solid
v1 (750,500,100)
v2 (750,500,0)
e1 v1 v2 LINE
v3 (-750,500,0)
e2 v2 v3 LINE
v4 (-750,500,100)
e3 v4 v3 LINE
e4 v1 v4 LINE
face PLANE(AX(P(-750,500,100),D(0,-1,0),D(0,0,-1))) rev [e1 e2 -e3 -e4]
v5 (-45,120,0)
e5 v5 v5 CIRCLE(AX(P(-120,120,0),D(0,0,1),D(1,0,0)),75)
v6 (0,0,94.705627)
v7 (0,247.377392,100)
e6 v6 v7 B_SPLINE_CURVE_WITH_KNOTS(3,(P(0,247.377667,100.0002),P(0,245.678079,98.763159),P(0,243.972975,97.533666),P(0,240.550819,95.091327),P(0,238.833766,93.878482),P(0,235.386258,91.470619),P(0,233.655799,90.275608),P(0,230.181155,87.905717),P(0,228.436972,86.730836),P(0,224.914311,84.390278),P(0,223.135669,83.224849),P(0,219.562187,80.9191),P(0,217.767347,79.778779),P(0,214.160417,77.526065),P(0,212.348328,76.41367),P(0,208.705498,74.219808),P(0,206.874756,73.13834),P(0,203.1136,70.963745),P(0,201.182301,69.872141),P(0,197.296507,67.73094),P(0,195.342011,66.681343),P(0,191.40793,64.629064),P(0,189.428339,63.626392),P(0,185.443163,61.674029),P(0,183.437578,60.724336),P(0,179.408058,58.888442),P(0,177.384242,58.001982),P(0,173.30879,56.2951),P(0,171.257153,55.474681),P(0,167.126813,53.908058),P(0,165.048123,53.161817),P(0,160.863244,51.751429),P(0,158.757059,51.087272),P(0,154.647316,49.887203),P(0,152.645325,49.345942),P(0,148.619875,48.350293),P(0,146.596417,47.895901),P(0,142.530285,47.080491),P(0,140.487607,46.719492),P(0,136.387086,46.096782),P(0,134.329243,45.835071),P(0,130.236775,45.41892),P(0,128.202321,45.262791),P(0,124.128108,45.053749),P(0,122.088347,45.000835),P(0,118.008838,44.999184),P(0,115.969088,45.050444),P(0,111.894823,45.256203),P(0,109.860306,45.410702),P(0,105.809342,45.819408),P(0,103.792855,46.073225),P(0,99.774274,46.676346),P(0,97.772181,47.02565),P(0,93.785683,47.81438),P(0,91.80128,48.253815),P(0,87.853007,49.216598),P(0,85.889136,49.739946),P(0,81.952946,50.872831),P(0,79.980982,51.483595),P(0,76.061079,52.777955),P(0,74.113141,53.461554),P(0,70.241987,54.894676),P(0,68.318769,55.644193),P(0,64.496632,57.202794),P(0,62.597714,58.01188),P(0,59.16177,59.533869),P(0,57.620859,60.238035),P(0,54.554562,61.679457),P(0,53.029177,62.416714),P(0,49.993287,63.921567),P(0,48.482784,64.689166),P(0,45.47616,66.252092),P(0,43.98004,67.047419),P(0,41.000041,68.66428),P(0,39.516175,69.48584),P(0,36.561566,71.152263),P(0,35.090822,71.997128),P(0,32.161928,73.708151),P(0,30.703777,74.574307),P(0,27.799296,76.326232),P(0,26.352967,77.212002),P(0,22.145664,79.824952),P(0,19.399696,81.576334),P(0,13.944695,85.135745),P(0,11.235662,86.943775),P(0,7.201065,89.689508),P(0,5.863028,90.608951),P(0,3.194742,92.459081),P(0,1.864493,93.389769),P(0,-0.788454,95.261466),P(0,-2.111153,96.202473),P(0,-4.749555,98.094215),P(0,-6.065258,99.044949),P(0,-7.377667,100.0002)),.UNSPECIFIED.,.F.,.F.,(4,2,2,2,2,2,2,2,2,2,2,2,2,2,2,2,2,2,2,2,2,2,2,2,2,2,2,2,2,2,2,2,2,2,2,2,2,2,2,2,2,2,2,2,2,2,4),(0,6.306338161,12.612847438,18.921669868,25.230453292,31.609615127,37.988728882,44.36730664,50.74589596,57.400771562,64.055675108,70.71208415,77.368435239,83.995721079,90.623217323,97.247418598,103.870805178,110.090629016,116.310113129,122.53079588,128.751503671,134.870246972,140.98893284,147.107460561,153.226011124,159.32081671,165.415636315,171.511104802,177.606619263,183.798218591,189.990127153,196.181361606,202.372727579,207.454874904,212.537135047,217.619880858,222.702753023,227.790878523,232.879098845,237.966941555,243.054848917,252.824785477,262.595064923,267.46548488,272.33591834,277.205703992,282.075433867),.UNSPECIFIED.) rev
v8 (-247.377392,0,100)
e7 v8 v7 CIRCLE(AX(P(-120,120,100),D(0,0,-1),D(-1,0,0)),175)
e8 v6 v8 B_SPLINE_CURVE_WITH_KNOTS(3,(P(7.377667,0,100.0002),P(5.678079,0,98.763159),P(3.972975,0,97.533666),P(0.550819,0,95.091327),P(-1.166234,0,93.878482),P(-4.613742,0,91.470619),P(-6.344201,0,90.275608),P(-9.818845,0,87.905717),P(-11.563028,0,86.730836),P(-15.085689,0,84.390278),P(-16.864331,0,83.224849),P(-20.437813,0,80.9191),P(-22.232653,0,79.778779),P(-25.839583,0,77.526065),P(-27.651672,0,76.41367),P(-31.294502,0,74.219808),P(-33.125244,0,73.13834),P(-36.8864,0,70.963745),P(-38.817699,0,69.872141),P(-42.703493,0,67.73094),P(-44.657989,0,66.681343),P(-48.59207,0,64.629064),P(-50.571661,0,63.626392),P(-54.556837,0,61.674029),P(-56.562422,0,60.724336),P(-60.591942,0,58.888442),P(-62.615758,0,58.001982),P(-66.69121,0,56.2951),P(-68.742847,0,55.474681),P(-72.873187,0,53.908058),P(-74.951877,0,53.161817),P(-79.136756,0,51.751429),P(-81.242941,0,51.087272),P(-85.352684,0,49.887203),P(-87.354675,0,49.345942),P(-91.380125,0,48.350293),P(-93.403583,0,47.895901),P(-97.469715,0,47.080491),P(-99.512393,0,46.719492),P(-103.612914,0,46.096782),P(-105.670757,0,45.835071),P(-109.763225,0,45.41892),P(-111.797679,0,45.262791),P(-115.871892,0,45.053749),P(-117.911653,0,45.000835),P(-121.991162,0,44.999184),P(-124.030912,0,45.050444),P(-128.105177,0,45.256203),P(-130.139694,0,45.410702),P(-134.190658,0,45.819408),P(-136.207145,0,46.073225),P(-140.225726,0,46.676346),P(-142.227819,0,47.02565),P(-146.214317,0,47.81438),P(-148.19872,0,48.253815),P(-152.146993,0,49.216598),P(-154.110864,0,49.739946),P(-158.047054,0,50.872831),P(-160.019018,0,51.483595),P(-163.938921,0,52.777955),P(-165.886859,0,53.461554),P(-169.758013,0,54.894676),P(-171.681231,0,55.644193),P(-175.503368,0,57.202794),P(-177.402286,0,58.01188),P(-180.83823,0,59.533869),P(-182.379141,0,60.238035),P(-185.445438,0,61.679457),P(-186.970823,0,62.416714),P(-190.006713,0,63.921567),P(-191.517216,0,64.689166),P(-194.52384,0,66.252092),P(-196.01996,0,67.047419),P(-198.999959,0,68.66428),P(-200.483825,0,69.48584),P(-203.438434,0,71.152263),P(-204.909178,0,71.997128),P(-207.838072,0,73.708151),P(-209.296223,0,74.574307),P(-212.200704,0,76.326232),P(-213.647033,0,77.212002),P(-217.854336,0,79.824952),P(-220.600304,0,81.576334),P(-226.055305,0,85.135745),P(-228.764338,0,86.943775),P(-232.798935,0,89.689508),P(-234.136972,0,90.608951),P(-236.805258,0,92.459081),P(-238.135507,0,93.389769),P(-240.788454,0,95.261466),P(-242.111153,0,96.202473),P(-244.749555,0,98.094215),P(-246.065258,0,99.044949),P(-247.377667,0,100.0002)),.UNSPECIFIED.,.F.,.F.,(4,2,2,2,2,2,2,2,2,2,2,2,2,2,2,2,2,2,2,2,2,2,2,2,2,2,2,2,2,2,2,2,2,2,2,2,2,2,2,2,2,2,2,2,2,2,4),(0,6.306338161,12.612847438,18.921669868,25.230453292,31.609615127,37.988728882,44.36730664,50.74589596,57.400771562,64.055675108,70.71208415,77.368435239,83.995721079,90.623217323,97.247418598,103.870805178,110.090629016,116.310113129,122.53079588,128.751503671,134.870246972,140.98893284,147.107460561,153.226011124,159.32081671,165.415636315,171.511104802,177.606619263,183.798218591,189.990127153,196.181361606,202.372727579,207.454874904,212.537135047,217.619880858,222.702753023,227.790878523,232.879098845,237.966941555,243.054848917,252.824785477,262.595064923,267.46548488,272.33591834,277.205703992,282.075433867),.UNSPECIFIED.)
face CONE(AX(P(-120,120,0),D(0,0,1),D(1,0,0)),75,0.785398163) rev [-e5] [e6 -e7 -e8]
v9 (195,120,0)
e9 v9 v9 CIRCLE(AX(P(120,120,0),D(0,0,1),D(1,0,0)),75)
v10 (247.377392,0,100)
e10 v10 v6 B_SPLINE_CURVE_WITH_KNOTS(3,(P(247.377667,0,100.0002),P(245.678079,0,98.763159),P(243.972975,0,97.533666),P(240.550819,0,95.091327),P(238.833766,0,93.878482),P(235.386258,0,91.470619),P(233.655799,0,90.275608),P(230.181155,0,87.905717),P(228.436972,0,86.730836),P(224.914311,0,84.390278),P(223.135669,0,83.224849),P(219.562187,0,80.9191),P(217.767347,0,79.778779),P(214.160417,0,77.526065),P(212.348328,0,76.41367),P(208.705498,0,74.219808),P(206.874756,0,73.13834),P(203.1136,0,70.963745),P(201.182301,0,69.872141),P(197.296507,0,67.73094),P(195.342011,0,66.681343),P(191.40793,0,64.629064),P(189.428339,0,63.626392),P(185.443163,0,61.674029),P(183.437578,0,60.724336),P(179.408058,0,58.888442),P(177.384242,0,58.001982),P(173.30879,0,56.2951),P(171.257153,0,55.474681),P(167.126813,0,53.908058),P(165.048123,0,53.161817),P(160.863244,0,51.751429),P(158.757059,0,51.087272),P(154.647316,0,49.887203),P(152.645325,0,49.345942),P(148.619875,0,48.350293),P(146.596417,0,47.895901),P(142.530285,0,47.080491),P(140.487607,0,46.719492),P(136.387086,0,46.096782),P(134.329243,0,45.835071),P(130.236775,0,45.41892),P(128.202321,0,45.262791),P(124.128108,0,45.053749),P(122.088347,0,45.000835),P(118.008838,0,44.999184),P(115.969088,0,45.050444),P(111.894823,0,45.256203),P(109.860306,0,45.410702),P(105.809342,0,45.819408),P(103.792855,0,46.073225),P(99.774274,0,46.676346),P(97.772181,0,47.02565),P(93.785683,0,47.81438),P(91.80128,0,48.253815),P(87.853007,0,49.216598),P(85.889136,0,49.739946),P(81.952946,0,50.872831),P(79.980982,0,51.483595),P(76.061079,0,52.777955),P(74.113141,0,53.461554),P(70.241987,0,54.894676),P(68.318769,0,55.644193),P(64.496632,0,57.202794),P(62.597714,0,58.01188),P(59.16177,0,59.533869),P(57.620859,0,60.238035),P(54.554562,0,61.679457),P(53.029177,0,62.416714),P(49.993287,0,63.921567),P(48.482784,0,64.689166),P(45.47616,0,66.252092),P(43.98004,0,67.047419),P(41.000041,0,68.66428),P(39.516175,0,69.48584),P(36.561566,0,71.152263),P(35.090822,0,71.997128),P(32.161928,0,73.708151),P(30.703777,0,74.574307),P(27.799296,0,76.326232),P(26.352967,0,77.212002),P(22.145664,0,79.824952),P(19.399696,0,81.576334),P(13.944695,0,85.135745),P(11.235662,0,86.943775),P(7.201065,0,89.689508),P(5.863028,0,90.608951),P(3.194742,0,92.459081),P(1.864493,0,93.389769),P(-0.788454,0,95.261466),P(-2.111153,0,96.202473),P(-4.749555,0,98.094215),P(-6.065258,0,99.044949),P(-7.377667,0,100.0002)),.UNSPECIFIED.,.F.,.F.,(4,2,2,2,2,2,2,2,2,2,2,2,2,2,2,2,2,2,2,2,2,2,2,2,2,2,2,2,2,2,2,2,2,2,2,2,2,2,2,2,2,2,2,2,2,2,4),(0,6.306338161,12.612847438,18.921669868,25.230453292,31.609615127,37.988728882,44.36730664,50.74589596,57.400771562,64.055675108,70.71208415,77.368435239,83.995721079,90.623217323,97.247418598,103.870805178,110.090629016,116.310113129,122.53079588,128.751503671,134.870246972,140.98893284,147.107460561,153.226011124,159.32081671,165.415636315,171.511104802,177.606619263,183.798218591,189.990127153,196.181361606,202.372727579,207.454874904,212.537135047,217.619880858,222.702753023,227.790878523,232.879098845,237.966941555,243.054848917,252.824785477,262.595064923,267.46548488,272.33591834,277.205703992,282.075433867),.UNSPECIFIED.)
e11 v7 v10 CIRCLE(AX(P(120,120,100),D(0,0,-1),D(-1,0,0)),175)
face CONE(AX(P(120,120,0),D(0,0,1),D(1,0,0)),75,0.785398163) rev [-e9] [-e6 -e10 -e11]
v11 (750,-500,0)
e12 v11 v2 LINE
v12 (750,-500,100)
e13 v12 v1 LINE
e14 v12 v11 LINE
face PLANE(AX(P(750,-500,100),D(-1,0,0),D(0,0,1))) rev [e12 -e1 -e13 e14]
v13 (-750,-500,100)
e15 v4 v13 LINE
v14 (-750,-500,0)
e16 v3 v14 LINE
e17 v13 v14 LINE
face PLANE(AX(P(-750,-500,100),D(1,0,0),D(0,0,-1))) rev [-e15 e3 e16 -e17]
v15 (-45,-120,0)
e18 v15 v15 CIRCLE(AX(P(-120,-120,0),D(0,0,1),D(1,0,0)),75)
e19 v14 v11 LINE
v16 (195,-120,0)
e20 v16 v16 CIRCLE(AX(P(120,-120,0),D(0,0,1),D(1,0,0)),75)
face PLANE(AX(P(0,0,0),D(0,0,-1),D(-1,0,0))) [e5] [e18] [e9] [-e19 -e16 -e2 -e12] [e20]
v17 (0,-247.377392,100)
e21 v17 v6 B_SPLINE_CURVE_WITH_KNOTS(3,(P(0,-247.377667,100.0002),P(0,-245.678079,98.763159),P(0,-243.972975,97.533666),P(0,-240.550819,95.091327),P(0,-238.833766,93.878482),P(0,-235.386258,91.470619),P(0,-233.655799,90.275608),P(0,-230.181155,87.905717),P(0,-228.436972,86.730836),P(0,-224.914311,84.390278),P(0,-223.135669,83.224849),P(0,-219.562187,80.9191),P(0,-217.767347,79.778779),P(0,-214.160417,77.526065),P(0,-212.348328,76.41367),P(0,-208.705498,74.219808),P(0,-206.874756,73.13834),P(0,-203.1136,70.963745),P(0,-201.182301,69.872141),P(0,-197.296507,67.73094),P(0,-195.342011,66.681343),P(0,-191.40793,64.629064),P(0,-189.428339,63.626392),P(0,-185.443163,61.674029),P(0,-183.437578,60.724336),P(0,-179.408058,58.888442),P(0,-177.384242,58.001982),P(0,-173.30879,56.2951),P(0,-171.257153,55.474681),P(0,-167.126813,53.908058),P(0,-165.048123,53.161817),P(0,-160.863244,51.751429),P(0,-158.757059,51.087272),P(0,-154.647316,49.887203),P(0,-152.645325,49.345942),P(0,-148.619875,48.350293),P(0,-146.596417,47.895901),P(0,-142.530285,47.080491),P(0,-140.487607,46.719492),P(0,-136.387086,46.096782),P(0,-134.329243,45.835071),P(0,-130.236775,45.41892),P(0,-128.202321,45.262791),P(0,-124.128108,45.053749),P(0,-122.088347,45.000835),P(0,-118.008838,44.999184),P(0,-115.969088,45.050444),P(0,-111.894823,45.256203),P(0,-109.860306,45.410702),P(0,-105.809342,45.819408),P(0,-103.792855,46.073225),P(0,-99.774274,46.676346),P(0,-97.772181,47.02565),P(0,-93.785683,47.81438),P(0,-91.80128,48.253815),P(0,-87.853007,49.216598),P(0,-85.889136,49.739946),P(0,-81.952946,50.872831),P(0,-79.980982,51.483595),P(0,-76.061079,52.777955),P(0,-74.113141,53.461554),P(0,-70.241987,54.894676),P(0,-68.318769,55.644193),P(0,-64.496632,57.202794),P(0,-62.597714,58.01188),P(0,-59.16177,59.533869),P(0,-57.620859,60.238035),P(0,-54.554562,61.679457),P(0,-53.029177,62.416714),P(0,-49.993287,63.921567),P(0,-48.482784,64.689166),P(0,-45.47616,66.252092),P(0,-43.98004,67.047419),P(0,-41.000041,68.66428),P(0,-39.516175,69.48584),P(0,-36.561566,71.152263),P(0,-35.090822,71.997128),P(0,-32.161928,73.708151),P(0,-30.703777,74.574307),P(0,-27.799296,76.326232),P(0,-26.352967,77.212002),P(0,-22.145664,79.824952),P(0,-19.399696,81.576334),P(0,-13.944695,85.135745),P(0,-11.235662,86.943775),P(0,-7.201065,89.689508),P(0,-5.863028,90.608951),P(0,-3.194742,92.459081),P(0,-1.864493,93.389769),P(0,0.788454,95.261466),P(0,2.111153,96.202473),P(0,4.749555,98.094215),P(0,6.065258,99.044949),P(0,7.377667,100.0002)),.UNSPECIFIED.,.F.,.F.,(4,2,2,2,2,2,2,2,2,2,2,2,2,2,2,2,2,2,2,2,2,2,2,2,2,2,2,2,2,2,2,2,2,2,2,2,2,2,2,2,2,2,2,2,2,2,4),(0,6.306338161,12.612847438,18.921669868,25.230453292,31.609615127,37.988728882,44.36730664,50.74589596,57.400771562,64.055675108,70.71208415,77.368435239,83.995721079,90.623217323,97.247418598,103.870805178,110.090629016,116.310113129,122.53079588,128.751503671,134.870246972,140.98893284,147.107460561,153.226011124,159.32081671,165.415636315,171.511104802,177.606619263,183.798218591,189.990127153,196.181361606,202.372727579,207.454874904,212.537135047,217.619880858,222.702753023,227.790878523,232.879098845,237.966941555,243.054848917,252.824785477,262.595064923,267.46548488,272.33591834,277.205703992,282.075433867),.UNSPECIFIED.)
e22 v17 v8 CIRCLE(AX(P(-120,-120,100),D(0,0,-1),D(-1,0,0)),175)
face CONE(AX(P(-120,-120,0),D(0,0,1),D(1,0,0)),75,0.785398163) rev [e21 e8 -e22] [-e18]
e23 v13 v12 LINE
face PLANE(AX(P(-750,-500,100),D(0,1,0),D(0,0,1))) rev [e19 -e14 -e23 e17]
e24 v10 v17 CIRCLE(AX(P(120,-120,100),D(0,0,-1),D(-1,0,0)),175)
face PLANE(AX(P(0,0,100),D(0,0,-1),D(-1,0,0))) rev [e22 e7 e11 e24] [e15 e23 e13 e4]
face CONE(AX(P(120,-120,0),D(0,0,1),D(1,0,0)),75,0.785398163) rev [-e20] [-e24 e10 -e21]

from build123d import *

# Parameters (mm, degrees)
SKETCH1_W           = 1500
SKETCH1_H           = 1000
SKETCH1_R           = 75
BOSS_EXTRUDE1_DEPTH = 100
CHAMFER1_SIZE       = 100


with BuildPart() as part:
    # Sketch1 → Boss-Extrude1 (new body)
    with BuildSketch(Plane.XY):
        Rectangle(SKETCH1_W, SKETCH1_H)
        with Locations((-120, 120)):
            Circle(SKETCH1_R, mode=Mode.SUBTRACT)
        with Locations((120, 120)):
            Circle(SKETCH1_R, mode=Mode.SUBTRACT)
        with Locations((120, -120)):
            Circle(SKETCH1_R, mode=Mode.SUBTRACT)
        with Locations((-120, -120)):
            Circle(SKETCH1_R, mode=Mode.SUBTRACT)
    extrude(amount=BOSS_EXTRUDE1_DEPTH)

    # Chamfer1
    # the kernel refuses this chamfer: 100 mm, written as the material it takes off along each edge
    with BuildSketch(Plane(origin=(-120, 120, 100), x_dir=(1, 0, 0), z_dir=(0, -1, 0))) as chamfer1_piece_1:
        Polygon((75, -CHAMFER1_SIZE), (75 + CHAMFER1_SIZE, 0), (75, 0), align=None)
    revolve(axis=Axis((-120, 120, 100), (0, 0, 1)), mode=Mode.SUBTRACT)
    with BuildSketch(Plane(origin=(120, 120, 100), x_dir=(1, 0, 0), z_dir=(0, -1, 0))) as chamfer1_piece_2:
        Polygon((75, -CHAMFER1_SIZE), (75 + CHAMFER1_SIZE, 0), (75, 0), align=None)
    revolve(axis=Axis((120, 120, 100), (0, 0, 1)), mode=Mode.SUBTRACT)
    with BuildSketch(Plane(origin=(120, -120, 100), x_dir=(1, 0, 0), z_dir=(0, -1, 0))) as chamfer1_piece_3:
        Polygon((75, -CHAMFER1_SIZE), (75 + CHAMFER1_SIZE, 0), (75, 0), align=None)
    revolve(axis=Axis((120, -120, 100), (0, 0, 1)), mode=Mode.SUBTRACT)
    with BuildSketch(Plane(origin=(-120, -120, 100), x_dir=(1, 0, 0), z_dir=(0, -1, 0))) as chamfer1_piece_4:
        Polygon((75, -CHAMFER1_SIZE), (75 + CHAMFER1_SIZE, 0), (75, 0), align=None)
    revolve(axis=Axis((-120, -120, 100), (0, 0, 1)), mode=Mode.SUBTRACT)


solid = part.part
